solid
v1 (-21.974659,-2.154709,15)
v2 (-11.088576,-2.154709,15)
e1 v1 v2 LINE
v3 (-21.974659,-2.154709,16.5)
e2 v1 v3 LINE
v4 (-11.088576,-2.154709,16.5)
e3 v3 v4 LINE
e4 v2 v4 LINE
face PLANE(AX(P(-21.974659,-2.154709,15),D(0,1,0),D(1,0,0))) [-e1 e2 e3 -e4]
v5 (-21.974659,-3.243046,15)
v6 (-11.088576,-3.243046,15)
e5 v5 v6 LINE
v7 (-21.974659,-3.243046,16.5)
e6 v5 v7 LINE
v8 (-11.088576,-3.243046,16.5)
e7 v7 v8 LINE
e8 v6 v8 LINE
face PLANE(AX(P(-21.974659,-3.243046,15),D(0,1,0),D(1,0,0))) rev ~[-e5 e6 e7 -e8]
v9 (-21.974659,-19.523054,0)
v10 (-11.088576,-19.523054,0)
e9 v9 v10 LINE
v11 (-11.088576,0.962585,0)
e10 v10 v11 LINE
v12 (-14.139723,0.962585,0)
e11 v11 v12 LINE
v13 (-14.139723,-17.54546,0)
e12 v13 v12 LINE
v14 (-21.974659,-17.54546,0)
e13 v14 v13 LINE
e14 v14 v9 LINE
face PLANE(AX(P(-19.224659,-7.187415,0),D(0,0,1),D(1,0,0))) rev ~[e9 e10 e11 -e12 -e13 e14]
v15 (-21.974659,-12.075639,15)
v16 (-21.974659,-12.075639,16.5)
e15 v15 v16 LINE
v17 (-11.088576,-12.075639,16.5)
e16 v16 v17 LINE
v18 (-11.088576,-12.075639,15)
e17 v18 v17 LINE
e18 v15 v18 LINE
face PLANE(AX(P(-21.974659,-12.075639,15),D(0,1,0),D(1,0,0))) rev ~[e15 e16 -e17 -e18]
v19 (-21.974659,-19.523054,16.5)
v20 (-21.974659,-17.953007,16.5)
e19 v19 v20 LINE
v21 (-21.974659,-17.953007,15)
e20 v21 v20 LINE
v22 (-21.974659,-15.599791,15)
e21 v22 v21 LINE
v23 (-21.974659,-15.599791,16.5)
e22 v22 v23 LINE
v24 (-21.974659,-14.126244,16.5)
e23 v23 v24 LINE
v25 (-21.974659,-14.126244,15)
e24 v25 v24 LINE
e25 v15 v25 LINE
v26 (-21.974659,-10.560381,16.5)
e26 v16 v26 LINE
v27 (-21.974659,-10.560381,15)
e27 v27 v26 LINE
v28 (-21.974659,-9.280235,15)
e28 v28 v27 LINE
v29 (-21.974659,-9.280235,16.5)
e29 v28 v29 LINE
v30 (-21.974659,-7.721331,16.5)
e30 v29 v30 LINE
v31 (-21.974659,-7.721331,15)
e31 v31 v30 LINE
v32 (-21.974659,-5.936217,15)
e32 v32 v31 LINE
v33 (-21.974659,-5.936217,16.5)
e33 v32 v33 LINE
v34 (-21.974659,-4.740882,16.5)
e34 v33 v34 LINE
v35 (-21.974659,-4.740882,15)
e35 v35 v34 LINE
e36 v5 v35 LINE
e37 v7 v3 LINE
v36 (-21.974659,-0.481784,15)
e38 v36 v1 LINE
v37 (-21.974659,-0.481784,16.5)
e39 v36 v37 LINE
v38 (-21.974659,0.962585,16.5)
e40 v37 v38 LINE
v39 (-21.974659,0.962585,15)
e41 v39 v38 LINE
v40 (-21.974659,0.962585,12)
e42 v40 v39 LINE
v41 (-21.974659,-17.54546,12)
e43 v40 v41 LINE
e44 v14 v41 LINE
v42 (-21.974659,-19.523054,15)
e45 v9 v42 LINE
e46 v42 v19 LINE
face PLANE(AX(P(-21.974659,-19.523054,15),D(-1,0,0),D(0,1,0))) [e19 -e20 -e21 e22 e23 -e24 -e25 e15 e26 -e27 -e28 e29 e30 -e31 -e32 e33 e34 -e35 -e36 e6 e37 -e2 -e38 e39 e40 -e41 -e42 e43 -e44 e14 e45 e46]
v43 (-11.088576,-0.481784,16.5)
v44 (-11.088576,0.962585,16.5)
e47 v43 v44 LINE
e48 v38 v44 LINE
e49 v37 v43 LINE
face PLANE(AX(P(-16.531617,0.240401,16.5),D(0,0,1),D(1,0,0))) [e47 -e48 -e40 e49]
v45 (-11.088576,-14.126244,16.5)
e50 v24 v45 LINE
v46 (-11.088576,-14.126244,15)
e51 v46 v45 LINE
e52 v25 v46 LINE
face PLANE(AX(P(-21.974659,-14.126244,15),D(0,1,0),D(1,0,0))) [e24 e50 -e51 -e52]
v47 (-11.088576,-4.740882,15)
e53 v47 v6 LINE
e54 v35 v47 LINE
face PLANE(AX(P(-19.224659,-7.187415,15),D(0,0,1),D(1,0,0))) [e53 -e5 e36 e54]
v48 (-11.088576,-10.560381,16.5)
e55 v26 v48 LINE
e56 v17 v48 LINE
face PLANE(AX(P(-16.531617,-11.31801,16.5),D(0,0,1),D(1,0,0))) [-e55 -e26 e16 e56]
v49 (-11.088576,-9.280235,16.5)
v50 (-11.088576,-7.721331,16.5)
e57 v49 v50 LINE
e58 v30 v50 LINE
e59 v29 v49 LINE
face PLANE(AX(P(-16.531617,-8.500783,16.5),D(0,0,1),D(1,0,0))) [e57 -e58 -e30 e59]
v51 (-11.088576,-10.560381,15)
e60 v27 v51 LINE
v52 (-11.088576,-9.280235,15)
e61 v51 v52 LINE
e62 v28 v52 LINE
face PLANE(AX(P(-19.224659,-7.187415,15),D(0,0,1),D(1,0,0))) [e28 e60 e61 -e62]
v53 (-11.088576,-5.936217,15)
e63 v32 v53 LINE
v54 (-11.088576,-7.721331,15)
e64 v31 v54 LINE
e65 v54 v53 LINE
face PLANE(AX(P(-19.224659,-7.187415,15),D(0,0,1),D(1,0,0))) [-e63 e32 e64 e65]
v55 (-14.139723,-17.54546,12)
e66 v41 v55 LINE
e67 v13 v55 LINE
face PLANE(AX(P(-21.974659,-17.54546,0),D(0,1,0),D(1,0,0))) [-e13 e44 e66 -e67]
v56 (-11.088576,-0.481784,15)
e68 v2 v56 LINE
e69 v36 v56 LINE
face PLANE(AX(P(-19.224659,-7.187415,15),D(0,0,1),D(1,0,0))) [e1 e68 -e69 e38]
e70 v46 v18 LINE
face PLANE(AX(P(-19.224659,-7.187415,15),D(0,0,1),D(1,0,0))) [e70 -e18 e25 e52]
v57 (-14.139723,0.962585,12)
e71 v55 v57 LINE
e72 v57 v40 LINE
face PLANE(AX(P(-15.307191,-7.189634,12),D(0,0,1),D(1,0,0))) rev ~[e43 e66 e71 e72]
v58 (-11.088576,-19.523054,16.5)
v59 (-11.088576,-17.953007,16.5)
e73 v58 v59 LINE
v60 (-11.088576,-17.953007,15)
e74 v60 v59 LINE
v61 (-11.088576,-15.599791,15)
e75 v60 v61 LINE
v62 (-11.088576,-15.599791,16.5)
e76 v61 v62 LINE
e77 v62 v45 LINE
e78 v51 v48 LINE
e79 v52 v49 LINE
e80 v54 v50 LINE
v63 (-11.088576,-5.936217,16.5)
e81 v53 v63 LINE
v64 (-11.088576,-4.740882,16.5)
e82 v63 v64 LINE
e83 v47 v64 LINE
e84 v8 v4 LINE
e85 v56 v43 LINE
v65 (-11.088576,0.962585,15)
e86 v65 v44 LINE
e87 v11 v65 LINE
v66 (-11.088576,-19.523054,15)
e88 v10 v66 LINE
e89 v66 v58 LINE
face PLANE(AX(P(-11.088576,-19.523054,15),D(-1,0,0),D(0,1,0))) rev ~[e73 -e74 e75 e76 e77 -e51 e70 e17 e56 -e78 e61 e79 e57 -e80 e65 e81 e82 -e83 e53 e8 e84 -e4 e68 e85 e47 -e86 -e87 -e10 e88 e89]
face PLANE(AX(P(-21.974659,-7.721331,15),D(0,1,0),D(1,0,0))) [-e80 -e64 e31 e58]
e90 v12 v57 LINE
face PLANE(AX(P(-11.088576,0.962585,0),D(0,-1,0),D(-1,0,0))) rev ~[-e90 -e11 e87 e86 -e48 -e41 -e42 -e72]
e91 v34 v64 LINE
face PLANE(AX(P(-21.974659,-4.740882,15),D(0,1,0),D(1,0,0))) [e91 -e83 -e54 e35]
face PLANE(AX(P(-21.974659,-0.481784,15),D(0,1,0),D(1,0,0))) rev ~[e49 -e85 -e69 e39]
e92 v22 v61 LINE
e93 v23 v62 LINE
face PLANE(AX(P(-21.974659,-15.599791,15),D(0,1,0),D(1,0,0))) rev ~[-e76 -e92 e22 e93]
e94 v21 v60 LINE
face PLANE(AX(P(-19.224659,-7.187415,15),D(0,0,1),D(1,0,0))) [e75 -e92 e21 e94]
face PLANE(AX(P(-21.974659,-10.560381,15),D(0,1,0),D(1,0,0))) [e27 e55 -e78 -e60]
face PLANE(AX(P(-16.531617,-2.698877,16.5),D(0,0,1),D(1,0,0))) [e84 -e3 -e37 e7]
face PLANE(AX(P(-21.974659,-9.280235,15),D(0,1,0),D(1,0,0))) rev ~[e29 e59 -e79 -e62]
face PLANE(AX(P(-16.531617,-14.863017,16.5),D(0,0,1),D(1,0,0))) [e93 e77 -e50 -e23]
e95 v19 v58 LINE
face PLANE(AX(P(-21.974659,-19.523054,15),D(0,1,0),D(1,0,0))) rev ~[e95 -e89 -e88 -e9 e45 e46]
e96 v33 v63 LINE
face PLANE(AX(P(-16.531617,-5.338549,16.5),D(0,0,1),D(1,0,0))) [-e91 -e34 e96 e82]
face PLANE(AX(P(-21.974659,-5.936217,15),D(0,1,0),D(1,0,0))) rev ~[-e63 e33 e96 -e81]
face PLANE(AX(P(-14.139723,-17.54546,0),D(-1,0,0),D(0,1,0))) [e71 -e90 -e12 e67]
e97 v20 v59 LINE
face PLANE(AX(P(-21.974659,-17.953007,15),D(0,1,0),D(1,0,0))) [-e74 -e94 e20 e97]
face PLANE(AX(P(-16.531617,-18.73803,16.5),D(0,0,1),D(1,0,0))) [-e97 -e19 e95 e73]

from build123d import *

# Parameters (mm, degrees)
F0_W     = 5.5
F0_H     = 16.3
F0_W_2   = 2.3349355608
F0_H_2   = 2.2036070004
F1_DEPTH = 15
F2_DEPTH = 12
F3_W     = 10.8860824257
F3_H     = 1.5700478107
F3_H_2   = 1.4735469595
F3_H_3   = 1.5152581036
F3_H_4   = 1.5589032643
F3_H_5   = 1.1953348294
F3_H_6   = 1.0883370414
F3_H_7   = 1.4443685184
F4_DEPTH = 1.5


with BuildPart() as f1:
    # F0 (on Top) → F1 (new body)
    with BuildSketch(Plane.XY):
        with Locations((-19.2246585935, -7.1874150395)):
            Rectangle(F0_W, F0_H)
        Polygon((-14.1397230327, 0.9625849605), (-16.4746585935, 0.9625849605), (-16.4746585935, -15.3374150395), (-16.4746585935, -15.3418527916), (-14.1397230327, -15.3418527916), align=None)
        Polygon((-16.4746585935, -15.3374150395), (-21.9746585935, -15.3374150395), (-21.9746585935, -17.545459792), (-16.4746585935, -17.545459792), (-16.4746585935, -15.3418527916), align=None)
        Polygon((-11.0885761678, 0.9625849605), (-14.1397230327, 0.9625849605), (-14.1397230327, -15.3418527916), (-14.1397230327, -17.545459792), (-11.0885761678, -17.545459792), align=None)
        Polygon((-16.4746585935, -17.545459792), (-21.9746585935, -17.545459792), (-21.9746585935, -19.5230543613), (-11.0885761678, -19.5230543613), (-11.0885761678, -17.545459792), (-14.1397230327, -17.545459792), align=None)
        with Locations((-15.3071908131, -16.4436562918)):
            Rectangle(F0_W_2, F0_H_2)
    extrude(amount=F1_DEPTH)

    # F0 (on Top) → F2 (cut)
    with BuildSketch(Plane.XY):
        Polygon((-14.1397230327, 0.9625849605), (-16.4746585935, 0.9625849605), (-16.4746585935, -15.3374150395), (-16.4746585935, -15.3418527916), (-14.1397230327, -15.3418527916), align=None)
        with Locations((-19.2246585935, -7.1874150395)):
            Rectangle(F0_W, F0_H)
        Polygon((-16.4746585935, -15.3374150395), (-21.9746585935, -15.3374150395), (-21.9746585935, -17.545459792), (-16.4746585935, -17.545459792), (-16.4746585935, -15.3418527916), align=None)
        with Locations((-15.3071908131, -16.4436562918)):
            Rectangle(F0_W_2, F0_H_2)
    extrude(amount=F2_DEPTH, mode=Mode.SUBTRACT)

    # F3 (on face) → F4 (join)
    with BuildSketch(Plane.XY.offset(15)):
        with Locations((-16.5316173807, -18.738030456)):
            Rectangle(F3_W, F3_H)
        with Locations((-16.5316173807, -14.8630174808)):
            Rectangle(F3_W, F3_H_2)
        with Locations((-16.5316173807, -11.318010278)):
            Rectangle(F3_W, F3_H_3)
        with Locations((-16.5316173807, -8.5007830683)):
            Rectangle(F3_W, F3_H_4)
        with Locations((-16.5316173807, -5.3385491483)):
            Rectangle(F3_W, F3_H_5)
        with Locations((-16.5316173807, -2.6988773607)):
            Rectangle(F3_W, F3_H_6)
        with Locations((-16.5316173807, 0.2404007013)):
            Rectangle(F3_W, F3_H_7)
    extrude(amount=F4_DEPTH)


solid = f1.part
